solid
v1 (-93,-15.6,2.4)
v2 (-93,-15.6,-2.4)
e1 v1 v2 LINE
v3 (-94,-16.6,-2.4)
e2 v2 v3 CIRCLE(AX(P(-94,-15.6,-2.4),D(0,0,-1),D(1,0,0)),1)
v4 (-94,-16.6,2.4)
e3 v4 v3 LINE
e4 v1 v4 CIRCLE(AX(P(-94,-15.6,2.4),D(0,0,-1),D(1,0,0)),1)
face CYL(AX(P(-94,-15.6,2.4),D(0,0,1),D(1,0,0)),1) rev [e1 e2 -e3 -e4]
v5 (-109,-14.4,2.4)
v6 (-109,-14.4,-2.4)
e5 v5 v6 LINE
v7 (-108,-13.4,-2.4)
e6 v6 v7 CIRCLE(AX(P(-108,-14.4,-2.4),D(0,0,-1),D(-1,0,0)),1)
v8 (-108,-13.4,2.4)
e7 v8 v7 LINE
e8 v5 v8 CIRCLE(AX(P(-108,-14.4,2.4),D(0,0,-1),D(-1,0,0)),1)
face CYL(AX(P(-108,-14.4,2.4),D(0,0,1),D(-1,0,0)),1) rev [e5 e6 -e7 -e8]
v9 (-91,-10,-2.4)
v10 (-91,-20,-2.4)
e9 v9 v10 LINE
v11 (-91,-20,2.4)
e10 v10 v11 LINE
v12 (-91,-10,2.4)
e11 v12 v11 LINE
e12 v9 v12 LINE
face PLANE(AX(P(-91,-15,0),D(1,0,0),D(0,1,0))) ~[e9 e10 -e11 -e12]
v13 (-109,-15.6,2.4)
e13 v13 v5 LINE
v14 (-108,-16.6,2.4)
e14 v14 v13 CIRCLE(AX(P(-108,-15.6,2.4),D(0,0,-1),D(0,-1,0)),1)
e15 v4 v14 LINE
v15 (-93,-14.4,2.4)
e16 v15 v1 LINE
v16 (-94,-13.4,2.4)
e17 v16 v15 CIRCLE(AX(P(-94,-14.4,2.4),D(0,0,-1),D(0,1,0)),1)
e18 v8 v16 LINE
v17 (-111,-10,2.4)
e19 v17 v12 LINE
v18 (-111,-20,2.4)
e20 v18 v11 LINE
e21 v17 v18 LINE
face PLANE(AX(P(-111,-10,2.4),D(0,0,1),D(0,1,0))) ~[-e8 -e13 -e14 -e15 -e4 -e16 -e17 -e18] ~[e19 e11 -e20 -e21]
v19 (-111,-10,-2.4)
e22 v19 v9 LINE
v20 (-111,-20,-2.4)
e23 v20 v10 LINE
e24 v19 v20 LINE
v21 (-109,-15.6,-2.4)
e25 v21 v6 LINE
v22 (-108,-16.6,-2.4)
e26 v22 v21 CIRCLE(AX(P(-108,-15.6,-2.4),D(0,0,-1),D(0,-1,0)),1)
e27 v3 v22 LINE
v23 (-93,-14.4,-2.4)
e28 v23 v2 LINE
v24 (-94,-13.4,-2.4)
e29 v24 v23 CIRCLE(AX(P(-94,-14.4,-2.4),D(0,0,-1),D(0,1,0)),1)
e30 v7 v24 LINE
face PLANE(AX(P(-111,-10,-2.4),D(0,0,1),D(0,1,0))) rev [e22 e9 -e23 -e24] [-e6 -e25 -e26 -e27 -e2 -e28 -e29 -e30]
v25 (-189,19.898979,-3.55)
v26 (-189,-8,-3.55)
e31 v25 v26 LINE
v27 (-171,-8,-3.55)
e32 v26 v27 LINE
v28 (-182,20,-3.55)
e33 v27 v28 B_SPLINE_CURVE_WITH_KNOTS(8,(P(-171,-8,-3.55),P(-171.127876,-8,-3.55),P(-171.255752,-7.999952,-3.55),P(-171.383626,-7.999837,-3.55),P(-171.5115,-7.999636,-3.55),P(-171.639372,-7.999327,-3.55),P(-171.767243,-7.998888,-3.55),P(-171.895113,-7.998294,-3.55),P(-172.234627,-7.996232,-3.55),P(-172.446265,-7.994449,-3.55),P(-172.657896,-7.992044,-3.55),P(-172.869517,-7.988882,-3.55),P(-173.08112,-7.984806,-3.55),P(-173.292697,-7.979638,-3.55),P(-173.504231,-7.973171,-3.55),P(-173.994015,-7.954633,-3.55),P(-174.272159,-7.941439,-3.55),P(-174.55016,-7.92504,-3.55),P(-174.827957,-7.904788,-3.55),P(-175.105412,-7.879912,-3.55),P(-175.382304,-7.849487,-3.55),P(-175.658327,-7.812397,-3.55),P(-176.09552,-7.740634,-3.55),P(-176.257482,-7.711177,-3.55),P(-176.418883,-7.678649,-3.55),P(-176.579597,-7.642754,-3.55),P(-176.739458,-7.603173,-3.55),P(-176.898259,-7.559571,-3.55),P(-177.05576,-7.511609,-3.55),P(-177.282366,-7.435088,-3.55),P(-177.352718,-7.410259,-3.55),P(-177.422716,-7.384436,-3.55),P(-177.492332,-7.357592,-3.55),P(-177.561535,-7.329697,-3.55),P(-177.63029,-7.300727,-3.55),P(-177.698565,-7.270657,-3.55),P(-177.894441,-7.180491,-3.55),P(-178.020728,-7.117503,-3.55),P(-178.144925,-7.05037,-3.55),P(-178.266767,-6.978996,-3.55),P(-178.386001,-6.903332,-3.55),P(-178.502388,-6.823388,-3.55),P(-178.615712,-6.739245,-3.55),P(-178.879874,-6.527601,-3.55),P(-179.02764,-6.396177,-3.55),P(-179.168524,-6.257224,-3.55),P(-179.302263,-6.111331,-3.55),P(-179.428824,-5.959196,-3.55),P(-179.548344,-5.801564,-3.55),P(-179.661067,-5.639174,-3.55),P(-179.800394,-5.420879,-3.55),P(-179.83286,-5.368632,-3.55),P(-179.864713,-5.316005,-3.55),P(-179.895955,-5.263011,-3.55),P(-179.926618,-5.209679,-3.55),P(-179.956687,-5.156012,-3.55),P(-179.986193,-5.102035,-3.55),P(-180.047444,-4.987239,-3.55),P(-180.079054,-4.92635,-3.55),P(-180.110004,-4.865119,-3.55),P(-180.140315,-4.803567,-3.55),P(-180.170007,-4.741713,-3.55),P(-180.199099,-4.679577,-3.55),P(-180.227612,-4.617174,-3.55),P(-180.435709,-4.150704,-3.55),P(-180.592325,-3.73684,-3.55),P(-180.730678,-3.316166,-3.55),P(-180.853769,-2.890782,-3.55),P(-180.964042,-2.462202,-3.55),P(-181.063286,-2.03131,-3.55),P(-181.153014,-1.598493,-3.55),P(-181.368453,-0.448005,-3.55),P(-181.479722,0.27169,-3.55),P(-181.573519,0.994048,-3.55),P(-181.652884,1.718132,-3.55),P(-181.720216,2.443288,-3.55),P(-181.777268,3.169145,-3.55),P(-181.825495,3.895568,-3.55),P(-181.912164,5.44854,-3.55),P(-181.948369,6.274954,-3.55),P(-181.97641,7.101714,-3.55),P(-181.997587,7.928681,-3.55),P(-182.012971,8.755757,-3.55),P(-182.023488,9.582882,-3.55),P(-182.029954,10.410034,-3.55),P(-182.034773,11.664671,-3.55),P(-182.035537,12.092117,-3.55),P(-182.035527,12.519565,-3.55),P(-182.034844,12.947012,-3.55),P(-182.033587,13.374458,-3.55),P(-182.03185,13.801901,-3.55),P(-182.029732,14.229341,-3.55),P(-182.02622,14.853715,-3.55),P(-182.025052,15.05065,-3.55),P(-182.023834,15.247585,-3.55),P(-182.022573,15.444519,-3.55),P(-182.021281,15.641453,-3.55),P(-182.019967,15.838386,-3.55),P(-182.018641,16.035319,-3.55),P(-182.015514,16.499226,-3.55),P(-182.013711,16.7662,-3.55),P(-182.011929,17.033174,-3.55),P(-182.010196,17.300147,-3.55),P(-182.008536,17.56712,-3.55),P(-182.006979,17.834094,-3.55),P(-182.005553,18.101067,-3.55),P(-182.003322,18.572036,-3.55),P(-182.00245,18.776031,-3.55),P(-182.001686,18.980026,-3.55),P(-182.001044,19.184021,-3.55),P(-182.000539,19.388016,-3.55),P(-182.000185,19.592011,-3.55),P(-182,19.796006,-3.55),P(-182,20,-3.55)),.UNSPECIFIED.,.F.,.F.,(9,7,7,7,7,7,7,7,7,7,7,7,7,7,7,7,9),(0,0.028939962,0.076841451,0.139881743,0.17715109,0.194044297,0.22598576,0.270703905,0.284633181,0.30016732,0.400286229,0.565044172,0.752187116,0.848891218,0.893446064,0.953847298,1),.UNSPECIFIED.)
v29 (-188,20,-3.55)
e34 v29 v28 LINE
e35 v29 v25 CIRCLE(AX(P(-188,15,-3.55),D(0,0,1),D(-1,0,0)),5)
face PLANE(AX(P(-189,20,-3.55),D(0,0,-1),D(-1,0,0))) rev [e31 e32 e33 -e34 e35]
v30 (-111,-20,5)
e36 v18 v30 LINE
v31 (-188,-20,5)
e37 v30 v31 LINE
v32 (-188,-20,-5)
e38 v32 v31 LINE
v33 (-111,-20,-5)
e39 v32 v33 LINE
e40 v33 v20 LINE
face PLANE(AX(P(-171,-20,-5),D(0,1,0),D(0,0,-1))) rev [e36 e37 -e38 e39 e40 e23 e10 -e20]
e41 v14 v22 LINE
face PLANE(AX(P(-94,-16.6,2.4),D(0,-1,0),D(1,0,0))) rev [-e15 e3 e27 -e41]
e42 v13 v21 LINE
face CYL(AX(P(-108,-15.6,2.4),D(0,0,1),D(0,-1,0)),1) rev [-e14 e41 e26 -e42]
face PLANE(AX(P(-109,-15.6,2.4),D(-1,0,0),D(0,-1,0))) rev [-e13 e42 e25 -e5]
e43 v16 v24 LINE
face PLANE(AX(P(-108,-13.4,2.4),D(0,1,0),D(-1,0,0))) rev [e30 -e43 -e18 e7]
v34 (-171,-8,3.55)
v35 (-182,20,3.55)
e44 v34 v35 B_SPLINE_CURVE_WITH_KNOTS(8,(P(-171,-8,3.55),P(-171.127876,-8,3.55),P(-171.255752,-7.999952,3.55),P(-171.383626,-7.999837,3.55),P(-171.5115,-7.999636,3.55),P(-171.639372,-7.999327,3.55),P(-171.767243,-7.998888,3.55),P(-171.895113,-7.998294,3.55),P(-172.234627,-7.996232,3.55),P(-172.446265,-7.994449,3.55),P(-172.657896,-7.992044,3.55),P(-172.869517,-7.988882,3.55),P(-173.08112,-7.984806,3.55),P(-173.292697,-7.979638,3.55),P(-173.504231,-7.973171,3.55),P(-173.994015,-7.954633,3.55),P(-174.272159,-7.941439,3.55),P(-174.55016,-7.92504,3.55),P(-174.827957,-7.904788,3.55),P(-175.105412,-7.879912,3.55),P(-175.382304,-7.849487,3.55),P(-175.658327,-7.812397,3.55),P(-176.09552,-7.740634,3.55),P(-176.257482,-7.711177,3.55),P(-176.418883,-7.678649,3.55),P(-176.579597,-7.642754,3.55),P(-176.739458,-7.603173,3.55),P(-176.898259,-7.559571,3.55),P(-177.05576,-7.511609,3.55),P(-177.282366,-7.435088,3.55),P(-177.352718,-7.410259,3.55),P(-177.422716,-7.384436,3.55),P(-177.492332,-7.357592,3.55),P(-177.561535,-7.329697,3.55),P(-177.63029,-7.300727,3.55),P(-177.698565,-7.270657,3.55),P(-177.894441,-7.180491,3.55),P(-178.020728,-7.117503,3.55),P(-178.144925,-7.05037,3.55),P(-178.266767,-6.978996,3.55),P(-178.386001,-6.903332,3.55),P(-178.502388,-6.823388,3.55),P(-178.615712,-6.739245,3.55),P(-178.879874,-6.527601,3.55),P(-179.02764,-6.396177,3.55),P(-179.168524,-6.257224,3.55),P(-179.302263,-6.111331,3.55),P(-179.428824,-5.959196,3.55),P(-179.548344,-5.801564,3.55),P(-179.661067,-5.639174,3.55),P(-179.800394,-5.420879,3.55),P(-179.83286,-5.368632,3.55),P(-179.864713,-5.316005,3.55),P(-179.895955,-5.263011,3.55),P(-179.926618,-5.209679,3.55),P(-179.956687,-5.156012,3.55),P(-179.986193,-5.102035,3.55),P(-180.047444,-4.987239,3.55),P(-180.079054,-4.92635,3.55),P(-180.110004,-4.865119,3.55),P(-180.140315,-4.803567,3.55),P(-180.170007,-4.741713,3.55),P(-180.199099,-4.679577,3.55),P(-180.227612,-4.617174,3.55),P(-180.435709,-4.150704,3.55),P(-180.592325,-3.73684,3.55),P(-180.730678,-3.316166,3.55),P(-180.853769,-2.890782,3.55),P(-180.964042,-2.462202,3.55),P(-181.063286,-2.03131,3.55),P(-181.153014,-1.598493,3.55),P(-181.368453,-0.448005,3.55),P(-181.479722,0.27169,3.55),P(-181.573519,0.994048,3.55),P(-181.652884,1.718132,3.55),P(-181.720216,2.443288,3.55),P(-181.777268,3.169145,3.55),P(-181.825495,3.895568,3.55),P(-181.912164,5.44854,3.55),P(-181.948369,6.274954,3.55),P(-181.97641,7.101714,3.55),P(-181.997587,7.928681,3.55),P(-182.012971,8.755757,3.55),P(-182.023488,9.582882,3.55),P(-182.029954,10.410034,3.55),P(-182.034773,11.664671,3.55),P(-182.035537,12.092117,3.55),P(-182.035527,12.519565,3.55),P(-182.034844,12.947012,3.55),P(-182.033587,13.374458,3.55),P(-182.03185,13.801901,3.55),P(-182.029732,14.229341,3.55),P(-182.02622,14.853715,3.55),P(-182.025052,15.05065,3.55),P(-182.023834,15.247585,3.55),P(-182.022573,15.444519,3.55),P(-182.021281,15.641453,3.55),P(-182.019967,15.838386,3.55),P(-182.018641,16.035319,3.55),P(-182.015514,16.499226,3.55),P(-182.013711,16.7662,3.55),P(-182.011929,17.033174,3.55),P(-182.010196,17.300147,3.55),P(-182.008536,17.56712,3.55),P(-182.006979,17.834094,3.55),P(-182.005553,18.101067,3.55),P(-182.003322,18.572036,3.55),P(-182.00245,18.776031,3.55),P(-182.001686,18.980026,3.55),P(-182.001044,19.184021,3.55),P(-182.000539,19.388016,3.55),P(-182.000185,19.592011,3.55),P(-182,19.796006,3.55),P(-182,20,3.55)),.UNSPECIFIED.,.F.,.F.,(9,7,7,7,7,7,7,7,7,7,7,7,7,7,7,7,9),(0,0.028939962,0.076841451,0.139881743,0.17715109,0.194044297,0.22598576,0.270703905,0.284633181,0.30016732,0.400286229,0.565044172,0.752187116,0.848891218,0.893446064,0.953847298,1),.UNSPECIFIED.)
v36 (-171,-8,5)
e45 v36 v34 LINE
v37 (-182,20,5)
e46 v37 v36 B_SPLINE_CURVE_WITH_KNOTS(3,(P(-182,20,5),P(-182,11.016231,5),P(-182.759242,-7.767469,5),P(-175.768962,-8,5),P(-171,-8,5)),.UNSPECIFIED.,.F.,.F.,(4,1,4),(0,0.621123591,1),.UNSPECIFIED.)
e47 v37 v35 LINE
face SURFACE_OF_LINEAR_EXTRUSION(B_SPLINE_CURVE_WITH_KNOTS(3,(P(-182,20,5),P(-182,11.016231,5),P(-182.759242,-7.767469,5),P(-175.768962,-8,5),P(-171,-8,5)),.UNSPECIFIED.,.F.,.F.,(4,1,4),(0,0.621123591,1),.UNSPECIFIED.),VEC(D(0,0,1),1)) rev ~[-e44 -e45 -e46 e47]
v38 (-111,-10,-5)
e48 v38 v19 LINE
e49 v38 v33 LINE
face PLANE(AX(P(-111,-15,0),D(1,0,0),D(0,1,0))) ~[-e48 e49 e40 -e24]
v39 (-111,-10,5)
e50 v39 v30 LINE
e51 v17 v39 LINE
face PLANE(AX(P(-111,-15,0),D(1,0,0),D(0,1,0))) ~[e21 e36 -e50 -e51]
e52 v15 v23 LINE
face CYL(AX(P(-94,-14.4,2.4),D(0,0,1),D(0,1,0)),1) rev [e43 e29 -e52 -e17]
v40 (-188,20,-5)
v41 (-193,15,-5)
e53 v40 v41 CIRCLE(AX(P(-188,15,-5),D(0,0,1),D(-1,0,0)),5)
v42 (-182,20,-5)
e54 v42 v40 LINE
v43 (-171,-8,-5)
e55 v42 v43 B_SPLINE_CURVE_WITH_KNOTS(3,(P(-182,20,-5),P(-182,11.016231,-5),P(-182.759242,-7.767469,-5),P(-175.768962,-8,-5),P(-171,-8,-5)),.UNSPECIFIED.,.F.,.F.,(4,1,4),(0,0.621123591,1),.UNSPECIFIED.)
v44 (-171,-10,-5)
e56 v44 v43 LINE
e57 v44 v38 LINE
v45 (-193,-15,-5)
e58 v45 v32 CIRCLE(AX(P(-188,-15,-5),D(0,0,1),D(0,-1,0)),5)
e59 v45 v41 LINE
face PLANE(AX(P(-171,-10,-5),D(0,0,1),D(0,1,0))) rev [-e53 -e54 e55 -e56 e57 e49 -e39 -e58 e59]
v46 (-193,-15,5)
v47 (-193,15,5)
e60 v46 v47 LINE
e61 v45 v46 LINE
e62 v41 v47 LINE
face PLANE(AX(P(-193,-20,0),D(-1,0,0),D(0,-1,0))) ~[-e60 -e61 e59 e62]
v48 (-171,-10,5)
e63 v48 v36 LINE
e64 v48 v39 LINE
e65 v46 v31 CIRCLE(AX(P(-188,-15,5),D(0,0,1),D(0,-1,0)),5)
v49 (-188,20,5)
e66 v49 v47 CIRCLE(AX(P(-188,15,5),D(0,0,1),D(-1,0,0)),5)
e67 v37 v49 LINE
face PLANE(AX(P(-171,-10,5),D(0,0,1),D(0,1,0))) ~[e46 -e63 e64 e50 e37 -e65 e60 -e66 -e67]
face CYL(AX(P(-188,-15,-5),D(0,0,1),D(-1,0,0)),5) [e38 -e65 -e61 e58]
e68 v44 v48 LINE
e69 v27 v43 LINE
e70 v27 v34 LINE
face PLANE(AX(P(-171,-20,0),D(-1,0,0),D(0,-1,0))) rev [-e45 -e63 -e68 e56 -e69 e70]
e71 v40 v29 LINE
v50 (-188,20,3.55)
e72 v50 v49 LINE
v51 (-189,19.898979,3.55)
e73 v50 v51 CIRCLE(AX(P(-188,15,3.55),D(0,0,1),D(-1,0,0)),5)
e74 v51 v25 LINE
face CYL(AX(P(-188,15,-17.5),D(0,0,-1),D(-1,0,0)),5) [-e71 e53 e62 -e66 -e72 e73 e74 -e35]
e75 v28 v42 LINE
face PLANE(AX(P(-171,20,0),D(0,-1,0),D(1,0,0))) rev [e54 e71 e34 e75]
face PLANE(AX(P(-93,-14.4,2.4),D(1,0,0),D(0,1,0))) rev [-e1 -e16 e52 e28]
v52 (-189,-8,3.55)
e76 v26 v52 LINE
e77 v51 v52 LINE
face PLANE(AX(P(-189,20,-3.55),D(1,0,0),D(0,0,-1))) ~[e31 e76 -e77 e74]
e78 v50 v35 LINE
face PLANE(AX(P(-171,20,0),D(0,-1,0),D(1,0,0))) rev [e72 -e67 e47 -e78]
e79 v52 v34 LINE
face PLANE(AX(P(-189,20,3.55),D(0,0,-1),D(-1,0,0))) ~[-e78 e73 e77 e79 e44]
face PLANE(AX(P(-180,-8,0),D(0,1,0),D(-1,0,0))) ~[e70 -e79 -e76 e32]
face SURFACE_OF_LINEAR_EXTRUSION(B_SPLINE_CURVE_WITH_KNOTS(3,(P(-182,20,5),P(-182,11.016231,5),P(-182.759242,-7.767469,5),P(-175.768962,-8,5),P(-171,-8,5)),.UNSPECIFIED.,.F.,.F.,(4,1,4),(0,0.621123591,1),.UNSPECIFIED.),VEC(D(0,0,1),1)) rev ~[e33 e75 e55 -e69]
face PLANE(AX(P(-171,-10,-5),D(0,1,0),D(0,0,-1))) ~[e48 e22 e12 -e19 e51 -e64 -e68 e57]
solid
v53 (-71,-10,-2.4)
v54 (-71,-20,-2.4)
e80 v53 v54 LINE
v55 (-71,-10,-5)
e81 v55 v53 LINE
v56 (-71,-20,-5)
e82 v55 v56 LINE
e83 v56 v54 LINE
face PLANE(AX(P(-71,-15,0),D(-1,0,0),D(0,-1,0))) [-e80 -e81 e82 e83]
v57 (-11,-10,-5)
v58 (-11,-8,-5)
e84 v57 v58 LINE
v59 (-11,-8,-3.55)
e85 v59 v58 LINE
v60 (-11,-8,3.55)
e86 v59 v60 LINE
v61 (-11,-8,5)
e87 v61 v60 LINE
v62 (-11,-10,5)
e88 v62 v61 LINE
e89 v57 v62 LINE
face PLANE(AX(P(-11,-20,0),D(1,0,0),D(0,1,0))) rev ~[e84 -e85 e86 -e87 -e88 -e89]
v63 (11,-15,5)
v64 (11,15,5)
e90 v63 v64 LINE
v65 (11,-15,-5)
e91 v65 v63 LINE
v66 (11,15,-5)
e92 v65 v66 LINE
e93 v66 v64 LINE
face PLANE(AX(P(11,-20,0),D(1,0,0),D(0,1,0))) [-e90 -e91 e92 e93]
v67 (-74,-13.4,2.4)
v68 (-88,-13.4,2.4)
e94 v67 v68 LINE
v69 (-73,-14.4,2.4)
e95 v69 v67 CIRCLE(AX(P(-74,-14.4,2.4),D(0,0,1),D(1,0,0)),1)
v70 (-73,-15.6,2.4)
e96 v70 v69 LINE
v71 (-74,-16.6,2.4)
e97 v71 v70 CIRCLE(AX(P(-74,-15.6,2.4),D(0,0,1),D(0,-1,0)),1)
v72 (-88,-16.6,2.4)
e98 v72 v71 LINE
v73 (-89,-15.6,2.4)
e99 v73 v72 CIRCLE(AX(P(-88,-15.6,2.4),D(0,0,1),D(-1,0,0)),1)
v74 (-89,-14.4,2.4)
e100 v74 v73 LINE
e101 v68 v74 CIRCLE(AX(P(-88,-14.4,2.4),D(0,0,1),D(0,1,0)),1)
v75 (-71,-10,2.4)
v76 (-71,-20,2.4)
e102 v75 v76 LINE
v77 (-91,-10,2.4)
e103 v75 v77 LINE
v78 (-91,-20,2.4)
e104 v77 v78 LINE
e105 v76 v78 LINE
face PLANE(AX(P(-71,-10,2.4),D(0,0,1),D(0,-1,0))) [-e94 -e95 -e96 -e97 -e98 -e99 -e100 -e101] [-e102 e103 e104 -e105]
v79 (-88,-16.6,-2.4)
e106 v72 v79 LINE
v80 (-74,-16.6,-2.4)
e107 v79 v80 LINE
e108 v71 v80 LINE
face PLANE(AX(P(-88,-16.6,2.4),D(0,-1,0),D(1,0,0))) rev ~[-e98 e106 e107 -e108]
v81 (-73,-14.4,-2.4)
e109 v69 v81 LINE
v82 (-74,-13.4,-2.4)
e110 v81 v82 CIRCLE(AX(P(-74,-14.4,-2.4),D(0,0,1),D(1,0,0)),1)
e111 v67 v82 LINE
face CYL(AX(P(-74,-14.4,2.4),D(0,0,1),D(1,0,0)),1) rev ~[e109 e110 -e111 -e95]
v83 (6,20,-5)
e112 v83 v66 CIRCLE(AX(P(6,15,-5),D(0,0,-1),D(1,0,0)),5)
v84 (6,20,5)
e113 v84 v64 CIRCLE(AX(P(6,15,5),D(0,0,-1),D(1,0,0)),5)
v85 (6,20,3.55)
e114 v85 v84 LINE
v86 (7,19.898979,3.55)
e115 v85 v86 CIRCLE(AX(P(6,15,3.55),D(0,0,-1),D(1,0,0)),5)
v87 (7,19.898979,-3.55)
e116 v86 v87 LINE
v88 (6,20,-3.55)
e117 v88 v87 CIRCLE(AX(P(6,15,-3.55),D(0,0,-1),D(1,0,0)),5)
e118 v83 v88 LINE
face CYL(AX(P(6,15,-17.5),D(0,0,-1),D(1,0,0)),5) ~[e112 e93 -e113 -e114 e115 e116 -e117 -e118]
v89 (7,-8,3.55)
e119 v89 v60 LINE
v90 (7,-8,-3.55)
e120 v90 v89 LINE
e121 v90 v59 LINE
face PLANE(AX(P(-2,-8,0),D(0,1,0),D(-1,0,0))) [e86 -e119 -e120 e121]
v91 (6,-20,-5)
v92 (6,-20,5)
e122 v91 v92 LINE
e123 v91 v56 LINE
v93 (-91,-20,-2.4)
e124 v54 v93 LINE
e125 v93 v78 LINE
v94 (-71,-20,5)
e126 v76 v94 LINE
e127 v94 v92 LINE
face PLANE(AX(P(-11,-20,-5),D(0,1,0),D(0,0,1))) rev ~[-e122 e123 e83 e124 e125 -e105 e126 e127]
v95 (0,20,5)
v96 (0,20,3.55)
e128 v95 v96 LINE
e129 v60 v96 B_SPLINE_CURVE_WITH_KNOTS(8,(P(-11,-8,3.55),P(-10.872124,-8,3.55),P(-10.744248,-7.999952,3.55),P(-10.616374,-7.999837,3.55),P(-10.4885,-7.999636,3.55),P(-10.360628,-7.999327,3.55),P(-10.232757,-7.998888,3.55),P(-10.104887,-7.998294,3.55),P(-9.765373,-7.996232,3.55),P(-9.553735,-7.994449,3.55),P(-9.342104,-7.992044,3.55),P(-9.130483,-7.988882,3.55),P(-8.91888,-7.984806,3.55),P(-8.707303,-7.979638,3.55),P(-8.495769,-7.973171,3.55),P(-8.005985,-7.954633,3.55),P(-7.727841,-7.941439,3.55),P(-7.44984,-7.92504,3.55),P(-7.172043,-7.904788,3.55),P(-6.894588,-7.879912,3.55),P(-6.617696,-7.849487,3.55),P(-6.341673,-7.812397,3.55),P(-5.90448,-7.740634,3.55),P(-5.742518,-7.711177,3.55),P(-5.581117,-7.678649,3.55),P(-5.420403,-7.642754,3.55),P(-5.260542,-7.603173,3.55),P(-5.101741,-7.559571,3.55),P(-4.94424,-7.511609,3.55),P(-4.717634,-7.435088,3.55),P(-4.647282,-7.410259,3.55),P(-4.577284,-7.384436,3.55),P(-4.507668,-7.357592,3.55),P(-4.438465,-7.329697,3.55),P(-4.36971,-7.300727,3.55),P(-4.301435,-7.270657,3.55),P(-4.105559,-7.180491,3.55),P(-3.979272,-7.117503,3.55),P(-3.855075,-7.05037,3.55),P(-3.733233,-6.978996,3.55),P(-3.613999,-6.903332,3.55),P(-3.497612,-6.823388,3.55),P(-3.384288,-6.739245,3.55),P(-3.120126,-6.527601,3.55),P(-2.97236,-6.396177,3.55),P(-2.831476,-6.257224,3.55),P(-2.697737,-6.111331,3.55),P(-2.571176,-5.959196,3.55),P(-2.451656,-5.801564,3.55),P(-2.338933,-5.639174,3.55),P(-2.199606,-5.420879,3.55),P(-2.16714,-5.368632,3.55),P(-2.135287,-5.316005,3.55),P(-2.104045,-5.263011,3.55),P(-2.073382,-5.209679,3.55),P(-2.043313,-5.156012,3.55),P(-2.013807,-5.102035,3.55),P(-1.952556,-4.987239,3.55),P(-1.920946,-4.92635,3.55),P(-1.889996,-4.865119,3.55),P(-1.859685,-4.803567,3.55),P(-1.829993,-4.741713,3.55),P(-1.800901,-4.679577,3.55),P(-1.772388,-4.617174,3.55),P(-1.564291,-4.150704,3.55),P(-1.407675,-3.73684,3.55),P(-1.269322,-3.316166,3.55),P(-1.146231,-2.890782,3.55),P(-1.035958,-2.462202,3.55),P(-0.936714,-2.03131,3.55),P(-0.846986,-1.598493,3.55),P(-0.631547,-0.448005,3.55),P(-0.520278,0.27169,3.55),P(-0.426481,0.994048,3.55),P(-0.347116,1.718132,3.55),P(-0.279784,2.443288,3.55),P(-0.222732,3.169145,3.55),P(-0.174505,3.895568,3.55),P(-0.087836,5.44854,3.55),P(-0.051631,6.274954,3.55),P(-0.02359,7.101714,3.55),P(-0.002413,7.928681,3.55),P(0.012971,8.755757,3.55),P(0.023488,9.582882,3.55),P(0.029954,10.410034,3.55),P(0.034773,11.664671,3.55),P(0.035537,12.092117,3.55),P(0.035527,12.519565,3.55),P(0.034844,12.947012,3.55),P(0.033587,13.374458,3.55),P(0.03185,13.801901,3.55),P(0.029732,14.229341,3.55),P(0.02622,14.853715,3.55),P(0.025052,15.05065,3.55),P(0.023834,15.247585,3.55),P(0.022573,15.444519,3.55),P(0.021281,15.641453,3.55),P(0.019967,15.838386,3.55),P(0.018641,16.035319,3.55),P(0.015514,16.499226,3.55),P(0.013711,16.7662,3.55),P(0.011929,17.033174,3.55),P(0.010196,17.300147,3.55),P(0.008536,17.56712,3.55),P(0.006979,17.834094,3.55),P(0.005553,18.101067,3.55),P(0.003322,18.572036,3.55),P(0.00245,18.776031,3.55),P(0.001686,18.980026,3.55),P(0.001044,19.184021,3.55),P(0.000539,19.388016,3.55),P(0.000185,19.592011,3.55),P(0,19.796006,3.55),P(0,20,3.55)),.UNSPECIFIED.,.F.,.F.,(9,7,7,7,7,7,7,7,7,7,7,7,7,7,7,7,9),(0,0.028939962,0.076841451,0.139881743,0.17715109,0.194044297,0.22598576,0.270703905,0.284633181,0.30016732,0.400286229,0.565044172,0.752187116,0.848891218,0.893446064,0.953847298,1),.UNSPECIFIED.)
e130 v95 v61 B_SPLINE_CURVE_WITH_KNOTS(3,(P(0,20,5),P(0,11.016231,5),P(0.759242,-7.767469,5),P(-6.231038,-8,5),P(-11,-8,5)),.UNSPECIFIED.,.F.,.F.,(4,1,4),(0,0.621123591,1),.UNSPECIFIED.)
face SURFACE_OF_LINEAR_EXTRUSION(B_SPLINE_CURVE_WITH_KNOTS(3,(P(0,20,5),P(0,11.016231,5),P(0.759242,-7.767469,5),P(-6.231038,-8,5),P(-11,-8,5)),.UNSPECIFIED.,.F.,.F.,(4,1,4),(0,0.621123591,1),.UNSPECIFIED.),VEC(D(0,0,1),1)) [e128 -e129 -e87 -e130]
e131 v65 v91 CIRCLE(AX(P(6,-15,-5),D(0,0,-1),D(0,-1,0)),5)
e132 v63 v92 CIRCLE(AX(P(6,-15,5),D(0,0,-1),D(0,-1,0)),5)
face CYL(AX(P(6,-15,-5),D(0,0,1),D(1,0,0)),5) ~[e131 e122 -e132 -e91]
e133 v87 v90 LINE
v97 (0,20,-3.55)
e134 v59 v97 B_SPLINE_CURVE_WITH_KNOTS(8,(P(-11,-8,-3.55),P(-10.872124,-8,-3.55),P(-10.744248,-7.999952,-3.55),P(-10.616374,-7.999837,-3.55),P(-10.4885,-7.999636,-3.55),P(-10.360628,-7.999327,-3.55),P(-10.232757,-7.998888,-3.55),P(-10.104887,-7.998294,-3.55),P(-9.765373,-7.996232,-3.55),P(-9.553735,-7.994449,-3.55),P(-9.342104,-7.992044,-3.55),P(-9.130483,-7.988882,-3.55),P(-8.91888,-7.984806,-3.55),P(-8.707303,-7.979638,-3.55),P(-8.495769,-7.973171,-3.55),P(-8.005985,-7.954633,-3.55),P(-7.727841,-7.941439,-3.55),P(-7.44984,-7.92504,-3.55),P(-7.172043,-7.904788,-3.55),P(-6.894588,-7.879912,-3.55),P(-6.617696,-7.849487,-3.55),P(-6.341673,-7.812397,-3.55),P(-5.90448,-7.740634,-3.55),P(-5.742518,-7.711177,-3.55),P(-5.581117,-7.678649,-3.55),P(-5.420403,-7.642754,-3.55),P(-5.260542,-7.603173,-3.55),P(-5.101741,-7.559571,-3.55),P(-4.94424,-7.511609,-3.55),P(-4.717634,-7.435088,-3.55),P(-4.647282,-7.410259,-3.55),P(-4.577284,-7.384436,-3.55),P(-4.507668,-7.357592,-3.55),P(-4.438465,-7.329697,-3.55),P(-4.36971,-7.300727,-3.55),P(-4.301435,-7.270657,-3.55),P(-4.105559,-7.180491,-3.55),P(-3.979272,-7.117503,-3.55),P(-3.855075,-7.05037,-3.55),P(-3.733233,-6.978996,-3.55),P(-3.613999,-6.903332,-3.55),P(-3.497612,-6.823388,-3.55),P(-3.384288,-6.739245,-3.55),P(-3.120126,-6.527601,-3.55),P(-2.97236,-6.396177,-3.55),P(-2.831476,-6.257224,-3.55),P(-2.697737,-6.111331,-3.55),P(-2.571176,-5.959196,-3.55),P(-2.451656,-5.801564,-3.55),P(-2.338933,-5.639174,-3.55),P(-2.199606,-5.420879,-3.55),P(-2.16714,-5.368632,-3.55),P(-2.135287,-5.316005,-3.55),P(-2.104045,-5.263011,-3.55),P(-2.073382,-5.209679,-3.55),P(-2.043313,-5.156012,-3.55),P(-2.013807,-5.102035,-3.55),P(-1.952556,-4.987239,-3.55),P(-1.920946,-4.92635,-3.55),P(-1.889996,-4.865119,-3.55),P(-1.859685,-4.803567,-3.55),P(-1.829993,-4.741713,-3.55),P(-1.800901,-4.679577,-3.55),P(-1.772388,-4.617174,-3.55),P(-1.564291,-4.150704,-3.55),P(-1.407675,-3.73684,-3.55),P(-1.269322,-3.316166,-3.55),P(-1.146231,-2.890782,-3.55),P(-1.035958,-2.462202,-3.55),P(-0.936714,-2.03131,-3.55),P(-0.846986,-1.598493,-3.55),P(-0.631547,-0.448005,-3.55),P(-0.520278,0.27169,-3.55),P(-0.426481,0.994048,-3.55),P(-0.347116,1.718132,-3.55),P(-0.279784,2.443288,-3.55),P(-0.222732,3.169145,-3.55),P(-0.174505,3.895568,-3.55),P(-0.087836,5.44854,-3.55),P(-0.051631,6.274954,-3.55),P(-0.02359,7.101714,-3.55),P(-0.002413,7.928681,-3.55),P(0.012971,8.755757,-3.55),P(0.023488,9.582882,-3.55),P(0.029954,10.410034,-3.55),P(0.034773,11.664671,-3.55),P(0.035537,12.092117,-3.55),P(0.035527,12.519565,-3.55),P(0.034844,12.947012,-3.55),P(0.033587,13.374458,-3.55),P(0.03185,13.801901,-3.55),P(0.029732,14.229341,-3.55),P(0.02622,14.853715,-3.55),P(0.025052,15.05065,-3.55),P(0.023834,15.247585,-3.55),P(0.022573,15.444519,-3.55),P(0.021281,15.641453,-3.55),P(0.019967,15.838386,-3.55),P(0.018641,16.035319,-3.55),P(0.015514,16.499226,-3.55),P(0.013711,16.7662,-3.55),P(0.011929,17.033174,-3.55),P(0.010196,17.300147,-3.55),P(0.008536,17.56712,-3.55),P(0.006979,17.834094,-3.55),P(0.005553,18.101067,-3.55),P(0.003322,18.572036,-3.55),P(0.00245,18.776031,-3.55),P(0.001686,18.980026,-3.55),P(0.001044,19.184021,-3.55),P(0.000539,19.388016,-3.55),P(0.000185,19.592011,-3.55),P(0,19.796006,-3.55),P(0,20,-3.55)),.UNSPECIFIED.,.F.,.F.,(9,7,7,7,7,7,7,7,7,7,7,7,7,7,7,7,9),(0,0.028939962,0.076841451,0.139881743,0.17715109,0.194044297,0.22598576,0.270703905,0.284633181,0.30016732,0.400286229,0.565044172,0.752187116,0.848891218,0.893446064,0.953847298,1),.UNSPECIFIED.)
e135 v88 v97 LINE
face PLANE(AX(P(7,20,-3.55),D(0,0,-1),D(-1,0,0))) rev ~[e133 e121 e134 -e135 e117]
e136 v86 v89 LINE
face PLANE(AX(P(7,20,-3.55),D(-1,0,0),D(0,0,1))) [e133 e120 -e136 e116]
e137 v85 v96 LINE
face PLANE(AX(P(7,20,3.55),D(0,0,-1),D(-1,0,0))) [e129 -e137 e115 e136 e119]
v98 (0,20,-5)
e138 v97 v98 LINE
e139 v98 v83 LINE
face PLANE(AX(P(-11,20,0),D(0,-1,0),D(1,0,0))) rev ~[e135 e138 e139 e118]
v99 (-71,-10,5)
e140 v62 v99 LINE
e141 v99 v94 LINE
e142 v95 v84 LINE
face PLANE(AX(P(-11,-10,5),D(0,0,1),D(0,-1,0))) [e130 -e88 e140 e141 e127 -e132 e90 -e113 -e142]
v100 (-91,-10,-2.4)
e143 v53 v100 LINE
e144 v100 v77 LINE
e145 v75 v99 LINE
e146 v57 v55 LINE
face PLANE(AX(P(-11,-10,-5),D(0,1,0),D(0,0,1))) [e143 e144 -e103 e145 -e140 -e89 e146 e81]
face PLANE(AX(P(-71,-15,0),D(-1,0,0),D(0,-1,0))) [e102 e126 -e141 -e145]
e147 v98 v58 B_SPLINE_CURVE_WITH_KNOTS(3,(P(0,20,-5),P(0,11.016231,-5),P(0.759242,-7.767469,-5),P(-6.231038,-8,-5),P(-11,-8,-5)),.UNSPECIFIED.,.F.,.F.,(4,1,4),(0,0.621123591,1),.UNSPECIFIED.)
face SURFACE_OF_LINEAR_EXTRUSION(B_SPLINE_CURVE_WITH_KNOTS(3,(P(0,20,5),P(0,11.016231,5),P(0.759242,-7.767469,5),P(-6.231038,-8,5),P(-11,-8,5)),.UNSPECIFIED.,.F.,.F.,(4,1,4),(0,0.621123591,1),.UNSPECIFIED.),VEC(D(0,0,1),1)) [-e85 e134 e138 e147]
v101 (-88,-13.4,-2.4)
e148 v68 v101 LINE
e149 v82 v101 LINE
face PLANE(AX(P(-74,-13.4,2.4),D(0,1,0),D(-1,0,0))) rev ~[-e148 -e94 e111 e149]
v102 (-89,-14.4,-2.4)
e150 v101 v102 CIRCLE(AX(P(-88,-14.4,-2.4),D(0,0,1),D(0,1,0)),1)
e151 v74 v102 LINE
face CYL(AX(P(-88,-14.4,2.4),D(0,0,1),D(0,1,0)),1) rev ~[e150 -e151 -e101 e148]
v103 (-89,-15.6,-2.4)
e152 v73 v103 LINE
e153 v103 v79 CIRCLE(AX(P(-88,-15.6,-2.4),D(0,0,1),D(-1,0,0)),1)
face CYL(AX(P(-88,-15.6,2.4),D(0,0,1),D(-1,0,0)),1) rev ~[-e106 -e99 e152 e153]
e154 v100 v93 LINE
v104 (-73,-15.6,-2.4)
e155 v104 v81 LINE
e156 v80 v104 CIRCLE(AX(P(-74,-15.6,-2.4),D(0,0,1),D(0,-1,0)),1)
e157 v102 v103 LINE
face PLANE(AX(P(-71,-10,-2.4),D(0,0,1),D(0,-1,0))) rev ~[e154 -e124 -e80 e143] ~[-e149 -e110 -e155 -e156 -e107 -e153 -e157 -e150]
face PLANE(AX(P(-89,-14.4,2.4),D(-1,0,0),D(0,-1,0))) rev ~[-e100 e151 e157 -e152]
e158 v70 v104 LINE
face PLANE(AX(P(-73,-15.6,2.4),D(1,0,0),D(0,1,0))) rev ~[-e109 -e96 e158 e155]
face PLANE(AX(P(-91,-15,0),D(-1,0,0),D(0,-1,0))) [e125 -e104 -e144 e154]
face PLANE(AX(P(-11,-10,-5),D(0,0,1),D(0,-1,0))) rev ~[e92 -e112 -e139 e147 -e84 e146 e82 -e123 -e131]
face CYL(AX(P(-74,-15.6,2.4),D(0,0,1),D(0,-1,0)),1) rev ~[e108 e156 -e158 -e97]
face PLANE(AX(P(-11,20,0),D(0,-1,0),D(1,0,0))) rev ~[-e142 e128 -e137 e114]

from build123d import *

# Parameters (mm, degrees)
F0_W         = 22
F0_H         = 40
F1_DEPTH     = 5
F2_W         = 18
F2_H         = 7.1
F3_DEPTH     = 28
F4_W         = 10
F4_H         = 10
F5_DEPTH     = 60
F6_W         = 10
F6_H         = 4.8
F7_DEPTH     = 20
F9_DEPTH     = 4.8
F11_DEPTH    = 10
F12_R        = 5
F13_T1_DEPTH = 35


# Not quite as in the source:
# - a fillet or chamfer that OpenCascade refuses, or shapes differently, is made with other operations: its cross-section is extruded or revolved along the edge and cut away or added


with BuildPart() as f1:
    # F0 (on Top) → F1 (new body, symmetric)
    with BuildSketch(Plane.XY):
        Rectangle(F0_W, F0_H)
    extrude(amount=F1_DEPTH, both=True)

    # F2 (on face) → F3 (cut)
    with BuildSketch(Plane(origin=(0, 20, 0), x_dir=(-1, 0, 0), z_dir=(0, 1, 0))):
        with Locations((2, 0)):
            Rectangle(F2_W, F2_H)
    extrude(amount=-F3_DEPTH, mode=Mode.SUBTRACT)

    # F4 (on face) → F5 (join)
    with BuildSketch(Plane(origin=(-11, 0, 0), x_dir=(0, -1, 0), z_dir=(-1, 0, 0))):
        with Locations((15, 0)):
            Rectangle(F4_W, F4_H)
    extrude(amount=F5_DEPTH)

    # F6 (on face) → F7 (join)
    with BuildSketch(Plane(origin=(-71, 0, 0), x_dir=(0, -1, 0), z_dir=(-1, 0, 0))):
        with Locations((15, 0)):
            Rectangle(F6_W, F6_H)
    extrude(amount=F7_DEPTH)

    # F8 (on face) → F9 (cut, through all)
    with BuildSketch(Plane.XY.offset(2.4)):
        with BuildLine():
            Line((-74, -13.4), (-88, -13.4))
            ThreePointArc((-88, -13.4), (-88.7071067812, -13.6928932188), (-89, -14.4))
            Line((-89, -14.4), (-89, -15.6))
            ThreePointArc((-89, -15.6), (-88.7071067812, -16.3071067812), (-88, -16.6))
            Line((-88, -16.6), (-74, -16.6))
            ThreePointArc((-74, -16.6), (-73.2928932188, -16.3071067812), (-73, -15.6))
            Line((-73, -15.6), (-73, -14.4))
            ThreePointArc((-73, -14.4), (-73.2928932188, -13.6928932188), (-74, -13.4))
        make_face()
    extrude(amount=-F9_DEPTH, mode=Mode.SUBTRACT)

    # F10 (on face) → F11 (cut, through all)
    with BuildSketch(Plane.XY.offset(5)):
        with BuildLine():
            add(Edge.make_bspline(
                [(0, 20), (0, 11.0162314684), (0.75924226, -7.767469097), (-6.2310384733, -8), (-11, -8)],
                knots=[0, 0, 0, 0, 0.6211235912, 1, 1, 1, 1], degree=3))
            Line((0, 20), (-11, 20))
            Line((-11, 20), (-11, -8))
        make_face()
    extrude(amount=-F11_DEPTH, mode=Mode.SUBTRACT)

    # F12
    f12_edges = [f1.edges().sort_by_distance(p)[0] for p in [
        (11, -20, 0),
    ]]
    fillet(f12_edges, radius=F12_R)

    # F13: fillet of radius 5 on 1 edges, made by hand

    # F13_s2 → F13_t1 (cut)
    with BuildSketch(Plane.XY.offset(-17.5)):
        with BuildLine():
            ThreePointArc((11, 15), (9.5355339059, 18.5355339059), (6, 20))
            Line((6, 20), (11, 20))
            Line((11, 20), (11, 15))
        make_face()
    extrude(amount=F13_T1_DEPTH, mode=Mode.SUBTRACT)


with BuildPart() as f14_1:
    # F14: instance of F1
    add(f1.part.mirror(Plane(origin=(-91, -15, 0), x_dir=(0, -1, 0), z_dir=(-1, 0, 0))))


solid = Compound([f1.part, f14_1.part])
